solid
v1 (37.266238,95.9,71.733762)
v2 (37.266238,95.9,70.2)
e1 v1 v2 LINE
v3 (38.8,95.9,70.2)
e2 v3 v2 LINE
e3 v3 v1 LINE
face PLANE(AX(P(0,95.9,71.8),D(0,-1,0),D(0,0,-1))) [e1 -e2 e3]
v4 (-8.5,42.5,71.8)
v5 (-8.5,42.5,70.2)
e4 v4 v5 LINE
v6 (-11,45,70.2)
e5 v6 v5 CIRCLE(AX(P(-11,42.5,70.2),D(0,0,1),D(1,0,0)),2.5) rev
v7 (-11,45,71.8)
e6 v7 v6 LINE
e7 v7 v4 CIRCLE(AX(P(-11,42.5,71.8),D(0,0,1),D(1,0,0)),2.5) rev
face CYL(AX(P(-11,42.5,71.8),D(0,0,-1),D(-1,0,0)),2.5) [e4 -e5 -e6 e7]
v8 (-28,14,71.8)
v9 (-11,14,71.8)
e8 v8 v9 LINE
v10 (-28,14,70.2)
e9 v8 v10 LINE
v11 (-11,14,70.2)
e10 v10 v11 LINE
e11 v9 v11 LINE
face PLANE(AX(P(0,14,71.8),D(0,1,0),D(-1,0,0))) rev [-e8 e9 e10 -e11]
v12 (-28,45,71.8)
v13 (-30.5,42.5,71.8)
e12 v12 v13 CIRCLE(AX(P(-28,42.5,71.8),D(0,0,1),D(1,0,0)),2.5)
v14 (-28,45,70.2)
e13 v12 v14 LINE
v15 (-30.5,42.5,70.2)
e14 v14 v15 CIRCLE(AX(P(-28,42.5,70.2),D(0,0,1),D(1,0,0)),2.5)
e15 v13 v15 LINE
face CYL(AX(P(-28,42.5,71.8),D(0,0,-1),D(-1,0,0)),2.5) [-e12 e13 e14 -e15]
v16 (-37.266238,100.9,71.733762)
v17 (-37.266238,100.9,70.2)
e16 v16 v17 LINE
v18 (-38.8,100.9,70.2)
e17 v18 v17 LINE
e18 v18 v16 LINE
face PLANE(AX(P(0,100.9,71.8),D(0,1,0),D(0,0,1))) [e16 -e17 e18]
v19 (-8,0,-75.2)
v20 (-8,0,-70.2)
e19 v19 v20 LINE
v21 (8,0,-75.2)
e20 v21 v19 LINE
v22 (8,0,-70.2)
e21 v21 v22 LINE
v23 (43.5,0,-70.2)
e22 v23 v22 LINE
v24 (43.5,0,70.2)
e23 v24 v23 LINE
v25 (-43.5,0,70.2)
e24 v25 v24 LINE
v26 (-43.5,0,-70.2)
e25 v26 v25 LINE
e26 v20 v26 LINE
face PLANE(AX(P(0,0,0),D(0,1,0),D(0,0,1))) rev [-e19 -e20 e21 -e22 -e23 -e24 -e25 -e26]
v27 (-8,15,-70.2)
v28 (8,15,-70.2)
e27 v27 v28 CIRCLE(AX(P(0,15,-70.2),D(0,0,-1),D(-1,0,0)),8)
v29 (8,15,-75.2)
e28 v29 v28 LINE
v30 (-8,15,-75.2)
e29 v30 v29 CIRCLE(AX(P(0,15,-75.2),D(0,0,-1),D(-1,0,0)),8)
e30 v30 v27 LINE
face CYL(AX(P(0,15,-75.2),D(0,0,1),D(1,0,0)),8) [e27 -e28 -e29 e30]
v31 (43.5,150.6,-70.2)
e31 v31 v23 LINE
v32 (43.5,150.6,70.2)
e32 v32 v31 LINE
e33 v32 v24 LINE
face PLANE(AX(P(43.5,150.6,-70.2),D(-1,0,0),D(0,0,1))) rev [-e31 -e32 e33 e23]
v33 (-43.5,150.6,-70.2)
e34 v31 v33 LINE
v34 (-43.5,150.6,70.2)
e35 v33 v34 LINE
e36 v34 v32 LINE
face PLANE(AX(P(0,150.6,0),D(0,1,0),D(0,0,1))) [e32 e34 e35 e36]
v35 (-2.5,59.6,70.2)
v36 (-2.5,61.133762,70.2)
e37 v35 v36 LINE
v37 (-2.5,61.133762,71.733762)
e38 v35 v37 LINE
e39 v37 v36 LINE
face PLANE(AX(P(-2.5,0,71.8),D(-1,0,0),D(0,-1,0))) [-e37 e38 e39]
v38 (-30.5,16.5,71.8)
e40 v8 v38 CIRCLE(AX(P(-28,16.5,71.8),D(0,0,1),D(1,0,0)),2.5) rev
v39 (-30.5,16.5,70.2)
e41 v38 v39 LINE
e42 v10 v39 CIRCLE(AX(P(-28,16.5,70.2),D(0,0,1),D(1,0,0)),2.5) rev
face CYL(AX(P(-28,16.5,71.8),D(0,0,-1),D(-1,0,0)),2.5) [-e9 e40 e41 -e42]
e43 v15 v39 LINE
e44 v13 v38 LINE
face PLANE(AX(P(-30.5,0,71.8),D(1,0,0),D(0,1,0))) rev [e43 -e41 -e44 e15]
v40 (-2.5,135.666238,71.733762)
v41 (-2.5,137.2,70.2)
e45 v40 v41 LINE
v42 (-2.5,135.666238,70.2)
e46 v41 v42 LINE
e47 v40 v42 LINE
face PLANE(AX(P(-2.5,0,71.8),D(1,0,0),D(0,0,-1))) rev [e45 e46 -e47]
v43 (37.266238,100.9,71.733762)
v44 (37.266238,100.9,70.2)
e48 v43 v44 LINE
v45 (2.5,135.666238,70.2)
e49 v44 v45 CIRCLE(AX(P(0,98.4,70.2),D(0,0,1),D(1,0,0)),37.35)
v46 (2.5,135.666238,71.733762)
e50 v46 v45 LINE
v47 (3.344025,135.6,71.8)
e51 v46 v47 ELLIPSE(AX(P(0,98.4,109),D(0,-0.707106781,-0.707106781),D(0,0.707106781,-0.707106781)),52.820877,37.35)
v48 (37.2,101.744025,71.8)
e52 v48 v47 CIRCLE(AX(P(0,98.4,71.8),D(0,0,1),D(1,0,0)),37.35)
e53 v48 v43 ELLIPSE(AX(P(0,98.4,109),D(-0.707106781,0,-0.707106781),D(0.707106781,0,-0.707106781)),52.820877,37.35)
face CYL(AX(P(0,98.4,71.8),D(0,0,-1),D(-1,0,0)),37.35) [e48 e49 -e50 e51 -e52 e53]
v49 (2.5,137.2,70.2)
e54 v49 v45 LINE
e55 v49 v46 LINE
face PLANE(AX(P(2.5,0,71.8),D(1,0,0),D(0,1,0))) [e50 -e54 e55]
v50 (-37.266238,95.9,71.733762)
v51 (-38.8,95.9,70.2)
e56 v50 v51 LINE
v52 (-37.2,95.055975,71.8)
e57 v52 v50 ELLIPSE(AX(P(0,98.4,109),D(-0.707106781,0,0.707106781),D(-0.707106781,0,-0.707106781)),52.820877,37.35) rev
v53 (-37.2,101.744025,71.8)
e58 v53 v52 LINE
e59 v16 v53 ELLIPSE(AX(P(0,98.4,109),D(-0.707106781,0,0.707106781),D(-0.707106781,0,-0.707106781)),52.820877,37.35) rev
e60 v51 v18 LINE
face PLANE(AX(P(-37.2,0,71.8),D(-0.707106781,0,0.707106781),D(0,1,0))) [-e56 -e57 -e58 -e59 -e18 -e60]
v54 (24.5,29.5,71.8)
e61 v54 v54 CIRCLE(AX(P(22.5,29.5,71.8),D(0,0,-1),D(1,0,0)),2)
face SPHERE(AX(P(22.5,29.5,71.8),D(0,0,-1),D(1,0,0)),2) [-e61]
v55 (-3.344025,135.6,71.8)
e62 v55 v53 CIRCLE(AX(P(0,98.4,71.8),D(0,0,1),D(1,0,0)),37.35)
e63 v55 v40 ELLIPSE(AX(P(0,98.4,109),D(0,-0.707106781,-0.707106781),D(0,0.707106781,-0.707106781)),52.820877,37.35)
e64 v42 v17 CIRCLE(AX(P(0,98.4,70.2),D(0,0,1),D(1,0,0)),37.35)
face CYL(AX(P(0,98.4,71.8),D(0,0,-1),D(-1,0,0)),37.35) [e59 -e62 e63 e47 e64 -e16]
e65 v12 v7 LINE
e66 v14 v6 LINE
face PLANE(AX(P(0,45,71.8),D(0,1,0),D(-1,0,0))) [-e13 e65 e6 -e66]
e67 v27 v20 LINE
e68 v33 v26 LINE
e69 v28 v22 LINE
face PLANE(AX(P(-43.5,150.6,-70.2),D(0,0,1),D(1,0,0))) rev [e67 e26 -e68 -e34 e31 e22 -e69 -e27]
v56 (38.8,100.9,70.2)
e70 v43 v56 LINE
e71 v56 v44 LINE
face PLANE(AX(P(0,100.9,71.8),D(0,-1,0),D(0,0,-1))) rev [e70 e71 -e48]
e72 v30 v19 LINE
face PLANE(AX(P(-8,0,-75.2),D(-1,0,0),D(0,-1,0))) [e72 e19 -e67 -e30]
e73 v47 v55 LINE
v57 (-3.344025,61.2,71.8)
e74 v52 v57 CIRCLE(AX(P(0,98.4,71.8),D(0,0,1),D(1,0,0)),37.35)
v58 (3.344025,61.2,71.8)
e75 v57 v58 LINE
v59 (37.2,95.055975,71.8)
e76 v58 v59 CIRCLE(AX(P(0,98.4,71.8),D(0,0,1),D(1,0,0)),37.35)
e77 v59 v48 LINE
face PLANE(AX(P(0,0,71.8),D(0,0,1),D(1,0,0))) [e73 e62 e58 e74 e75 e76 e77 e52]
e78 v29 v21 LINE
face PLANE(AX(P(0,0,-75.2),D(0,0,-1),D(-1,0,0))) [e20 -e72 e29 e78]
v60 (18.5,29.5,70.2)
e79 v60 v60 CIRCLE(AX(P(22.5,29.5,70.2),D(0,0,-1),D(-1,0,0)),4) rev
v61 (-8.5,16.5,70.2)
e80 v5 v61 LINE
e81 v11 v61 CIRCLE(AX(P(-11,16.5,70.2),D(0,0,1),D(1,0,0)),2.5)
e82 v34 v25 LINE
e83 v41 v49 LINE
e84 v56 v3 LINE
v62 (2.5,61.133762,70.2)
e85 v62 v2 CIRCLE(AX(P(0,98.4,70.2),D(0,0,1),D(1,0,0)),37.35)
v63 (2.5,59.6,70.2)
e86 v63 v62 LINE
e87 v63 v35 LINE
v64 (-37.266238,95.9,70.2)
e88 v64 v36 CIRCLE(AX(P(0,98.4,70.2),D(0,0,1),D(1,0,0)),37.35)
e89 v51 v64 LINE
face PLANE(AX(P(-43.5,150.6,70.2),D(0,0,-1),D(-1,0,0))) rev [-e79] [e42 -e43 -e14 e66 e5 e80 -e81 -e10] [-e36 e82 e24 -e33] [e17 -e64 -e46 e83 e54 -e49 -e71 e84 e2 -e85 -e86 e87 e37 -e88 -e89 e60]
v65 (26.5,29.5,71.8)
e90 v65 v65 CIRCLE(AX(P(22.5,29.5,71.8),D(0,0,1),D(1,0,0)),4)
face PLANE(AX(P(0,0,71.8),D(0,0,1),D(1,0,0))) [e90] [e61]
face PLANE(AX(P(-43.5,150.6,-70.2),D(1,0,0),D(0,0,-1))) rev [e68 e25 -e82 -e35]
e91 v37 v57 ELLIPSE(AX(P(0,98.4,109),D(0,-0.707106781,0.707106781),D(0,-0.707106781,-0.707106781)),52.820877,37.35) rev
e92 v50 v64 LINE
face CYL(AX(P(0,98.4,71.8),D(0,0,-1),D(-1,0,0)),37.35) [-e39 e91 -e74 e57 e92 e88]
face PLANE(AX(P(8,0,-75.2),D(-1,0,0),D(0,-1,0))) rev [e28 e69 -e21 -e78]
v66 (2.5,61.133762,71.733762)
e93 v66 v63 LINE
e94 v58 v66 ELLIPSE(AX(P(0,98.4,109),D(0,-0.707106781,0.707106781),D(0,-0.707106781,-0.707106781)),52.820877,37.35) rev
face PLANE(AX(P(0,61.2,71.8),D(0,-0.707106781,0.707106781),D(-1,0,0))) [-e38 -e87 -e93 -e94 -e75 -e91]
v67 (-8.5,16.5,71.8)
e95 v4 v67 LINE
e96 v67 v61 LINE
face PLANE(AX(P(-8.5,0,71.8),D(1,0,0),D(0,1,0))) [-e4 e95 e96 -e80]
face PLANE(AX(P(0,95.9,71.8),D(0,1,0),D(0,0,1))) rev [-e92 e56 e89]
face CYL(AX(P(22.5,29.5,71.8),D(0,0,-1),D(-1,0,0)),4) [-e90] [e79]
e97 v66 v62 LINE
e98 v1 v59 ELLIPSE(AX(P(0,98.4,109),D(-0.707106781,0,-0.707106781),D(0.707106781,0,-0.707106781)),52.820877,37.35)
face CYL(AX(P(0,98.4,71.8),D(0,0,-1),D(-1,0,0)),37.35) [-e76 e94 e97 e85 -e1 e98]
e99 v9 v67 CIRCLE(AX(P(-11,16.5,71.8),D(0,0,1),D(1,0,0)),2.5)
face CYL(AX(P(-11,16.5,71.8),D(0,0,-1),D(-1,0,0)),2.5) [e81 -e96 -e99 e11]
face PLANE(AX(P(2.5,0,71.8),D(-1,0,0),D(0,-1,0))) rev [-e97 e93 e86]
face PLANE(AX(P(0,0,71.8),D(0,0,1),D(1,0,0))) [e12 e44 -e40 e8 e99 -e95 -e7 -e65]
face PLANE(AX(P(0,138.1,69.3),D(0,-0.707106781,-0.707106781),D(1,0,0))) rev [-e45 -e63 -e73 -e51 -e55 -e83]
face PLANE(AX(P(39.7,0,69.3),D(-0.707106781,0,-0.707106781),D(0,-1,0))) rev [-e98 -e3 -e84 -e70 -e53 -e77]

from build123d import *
from build123d.topology import SkipClean

# Parameters (mm, degrees)
ESQUISSE1_W        = 87
ESQUISSE1_H        = 140.4
BOSS_EXTRU_1_DEPTH = 150.6
ESQUISSE2_W        = 2.433761929
ESQUISSE2_H        = 5
ESQUISSE2_W_2      = 5
ESQUISSE2_H_2      = 2.433761929
ESQUISSE2_R        = 4
BOSS_EXTRU_5_DEPTH = 1.6
R_VOLUTION1_ANGLE  = 180
CHANFREIN1_SIZE    = 2.5
BOSS_EXTRU_6_DEPTH = 5


with BuildPart() as part:
    # Esquisse1 → Boss.-Extru.1 (new body)
    with BuildSketch(Plane(origin=(0, 0, 0), x_dir=(1, 0, 0), z_dir=(0, 1, 0))):
        Rectangle(ESQUISSE1_W, ESQUISSE1_H)
    extrude(amount=BOSS_EXTRU_1_DEPTH)

    # Esquisse2 → Boss.-Extru.5 (add)
    with BuildSketch(Plane.XY.offset(70.2)):
        with BuildLine():
            Line((-37.266238071, 100.9), (-37.266238071, 95.9))
            ThreePointArc((-37.266238071, 95.9), (-26.410438277, 71.989561723), (-2.5, 61.133761929))
            Line((-2.5, 61.133761929), (2.5, 61.133761929))
            ThreePointArc((2.5, 61.133761929), (26.410438277, 71.989561723), (37.266238071, 95.9))
            Line((37.266238071, 95.9), (37.266238071, 100.9))
            ThreePointArc((37.266238071, 100.9), (26.410438277, 124.810438277), (2.5, 135.666238071))
            Line((2.5, 135.666238071), (-2.5, 135.666238071))
            ThreePointArc((-2.5, 135.666238071), (-26.410438277, 124.810438277), (-37.266238071, 100.9))
        make_face()
        with Locations((38.483119036, 98.4)):
            Rectangle(ESQUISSE2_W, ESQUISSE2_H)
        with Locations((0, 136.883119036)):
            Rectangle(ESQUISSE2_W_2, ESQUISSE2_H_2)
        with Locations((-38.483119036, 98.4)):
            Rectangle(ESQUISSE2_W, ESQUISSE2_H)
        with Locations((0, 59.916880965)):
            Rectangle(ESQUISSE2_W_2, ESQUISSE2_H_2)
        with BuildLine():
            Line((-11, 45), (-28, 45))
            ThreePointArc((-28, 45), (-29.767766953, 44.267766953), (-30.5, 42.5))
            Line((-30.5, 42.5), (-30.5, 16.5))
            ThreePointArc((-30.5, 16.5), (-29.767766953, 14.732233047), (-28, 14))
            Line((-28, 14), (-11, 14))
            ThreePointArc((-11, 14), (-9.232233047, 14.732233047), (-8.5, 16.5))
            Line((-8.5, 16.5), (-8.5, 42.5))
            ThreePointArc((-8.5, 42.5), (-9.232233047, 44.267766953), (-11, 45))
        make_face()
        with Locations(Location((22.5, 29.5, 0), (0, 0, 180))):
            Circle(ESQUISSE2_R)
    extrude(amount=BOSS_EXTRU_5_DEPTH)

    # Esquisse3 → Révolution1 (revolve)
    with SkipClean():  # the faces are left unmerged after this step: merging them gives an invalid solid
        with BuildSketch(Plane.XY.offset(71.8)):
            with BuildLine():
                ThreePointArc((24.5, 29.5), (22.5, 31.5), (20.5, 29.5))
                Line((20.5, 29.5), (24.5, 29.5))
            make_face()
            with BuildLine():
                Line((24.5, 29.5), (20.5, 29.5))
                ThreePointArc((20.5, 29.5), (22.5, 27.5), (24.5, 29.5))
            make_face()
        revolve(axis=Axis((20.5, 29.5, 71.8), (1, 0, 0)), revolution_arc=R_VOLUTION1_ANGLE)

    # Chanfrein1
    # the kernel refuses this chamfer: 2.5 mm, written as the material it adds along each edge
    # the kernel refuses this chamfer: 2.5 mm, written as the material it takes off along each edge
    with BuildSketch(Plane(origin=(8.92920747, 58.7, 71.8), x_dir=(0, -0.027495876610587663, -0.9996219169112968), z_dir=(-1, 0, 0))) as chanfrein1_2_piece_1_section:
        Polygon((CHANFREIN1_SIZE * 0.999621916911, -CHANFREIN1_SIZE * 0.0274958766106), (-CHANFREIN1_SIZE * 0.0274958766106, -CHANFREIN1_SIZE * 0.999621916911), (0, 0), align=None)
    chanfrein1_2_piece_1 = extrude(amount=17.85841494, mode=Mode.PRIVATE)
    chanfrein1_2_piece_1 = split(chanfrein1_2_piece_1, bisect_by=Plane(origin=(2.719982047, 61.166365842, 70.2), z_dir=(0, 0, 1)), keep=Keep.TOP, mode=Mode.PRIVATE)
    add(chanfrein1_2_piece_1, mode=Mode.SUBTRACT)
    with BuildSketch(Plane(origin=(-39.7, 89.47079253, 71.8), x_dir=(-0.027495876610587663, 0, -0.9996219169112968), z_dir=(0, 1, 0))) as chanfrein1_2_piece_2_section:
        Polygon((CHANFREIN1_SIZE * 0.999621916911, -CHANFREIN1_SIZE * 0.0274958766106), (-CHANFREIN1_SIZE * 0.0274958766106, -CHANFREIN1_SIZE * 0.999621916911), (0, 0), align=None)
    chanfrein1_2_piece_2 = extrude(amount=17.85841494, mode=Mode.PRIVATE)
    chanfrein1_2_piece_2 = split(chanfrein1_2_piece_2, bisect_by=Plane(origin=(-37.233634158, 95.680017953, 70.2), z_dir=(0, 0, 1)), keep=Keep.TOP, mode=Mode.PRIVATE)
    add(chanfrein1_2_piece_2, mode=Mode.SUBTRACT)
    with BuildSketch(Plane(origin=(-8.92920747, 138.1, 71.8), x_dir=(0, 0.02749587661058214, -0.9996219169112969), z_dir=(1, 0, 0))) as chanfrein1_2_piece_3_section:
        Polygon((CHANFREIN1_SIZE * 0.999621916911, -CHANFREIN1_SIZE * 0.0274958766106), (-CHANFREIN1_SIZE * 0.0274958766106, -CHANFREIN1_SIZE * 0.999621916911), (0, 0), align=None)
    chanfrein1_2_piece_3 = extrude(amount=17.85841494, mode=Mode.PRIVATE)
    chanfrein1_2_piece_3 = split(chanfrein1_2_piece_3, bisect_by=Plane(origin=(-2.719982047, 135.633634158, 70.2), z_dir=(0, 0, 1)), keep=Keep.TOP, mode=Mode.PRIVATE)
    add(chanfrein1_2_piece_3, mode=Mode.SUBTRACT)
    with BuildSketch(Plane(origin=(39.7, 107.32920747, 71.8), x_dir=(0.027495876610587663, 0, -0.9996219169112968), z_dir=(0, -1, 0))) as chanfrein1_2_piece_4_section:
        Polygon((CHANFREIN1_SIZE * 0.999621916911, -CHANFREIN1_SIZE * 0.0274958766106), (-CHANFREIN1_SIZE * 0.0274958766106, -CHANFREIN1_SIZE * 0.999621916911), (0, 0), align=None)
    chanfrein1_2_piece_4 = extrude(amount=17.85841494, mode=Mode.PRIVATE)
    chanfrein1_2_piece_4 = split(chanfrein1_2_piece_4, bisect_by=Plane(origin=(37.233634158, 101.119982047, 70.2), z_dir=(0, 0, 1)), keep=Keep.TOP, mode=Mode.PRIVATE)
    add(chanfrein1_2_piece_4, mode=Mode.SUBTRACT)

    # Esquisse4 → Boss.-Extru.6 (add)
    with BuildSketch(Plane(origin=(0, 0, -70.2), x_dir=(-1, 0, 0), z_dir=(0, 0, -1))):
        with BuildLine():
            Line((-8, 15), (-8, 0))
            Line((-8, 0), (8, 0))
            Line((8, 0), (8, 15))
            ThreePointArc((8, 15), (5.656854249, 20.656854249), (0, 23))
            ThreePointArc((0, 23), (-5.656854249, 20.656854249), (-8, 15))
        make_face()
    extrude(amount=BOSS_EXTRU_6_DEPTH)


solid = part.part
